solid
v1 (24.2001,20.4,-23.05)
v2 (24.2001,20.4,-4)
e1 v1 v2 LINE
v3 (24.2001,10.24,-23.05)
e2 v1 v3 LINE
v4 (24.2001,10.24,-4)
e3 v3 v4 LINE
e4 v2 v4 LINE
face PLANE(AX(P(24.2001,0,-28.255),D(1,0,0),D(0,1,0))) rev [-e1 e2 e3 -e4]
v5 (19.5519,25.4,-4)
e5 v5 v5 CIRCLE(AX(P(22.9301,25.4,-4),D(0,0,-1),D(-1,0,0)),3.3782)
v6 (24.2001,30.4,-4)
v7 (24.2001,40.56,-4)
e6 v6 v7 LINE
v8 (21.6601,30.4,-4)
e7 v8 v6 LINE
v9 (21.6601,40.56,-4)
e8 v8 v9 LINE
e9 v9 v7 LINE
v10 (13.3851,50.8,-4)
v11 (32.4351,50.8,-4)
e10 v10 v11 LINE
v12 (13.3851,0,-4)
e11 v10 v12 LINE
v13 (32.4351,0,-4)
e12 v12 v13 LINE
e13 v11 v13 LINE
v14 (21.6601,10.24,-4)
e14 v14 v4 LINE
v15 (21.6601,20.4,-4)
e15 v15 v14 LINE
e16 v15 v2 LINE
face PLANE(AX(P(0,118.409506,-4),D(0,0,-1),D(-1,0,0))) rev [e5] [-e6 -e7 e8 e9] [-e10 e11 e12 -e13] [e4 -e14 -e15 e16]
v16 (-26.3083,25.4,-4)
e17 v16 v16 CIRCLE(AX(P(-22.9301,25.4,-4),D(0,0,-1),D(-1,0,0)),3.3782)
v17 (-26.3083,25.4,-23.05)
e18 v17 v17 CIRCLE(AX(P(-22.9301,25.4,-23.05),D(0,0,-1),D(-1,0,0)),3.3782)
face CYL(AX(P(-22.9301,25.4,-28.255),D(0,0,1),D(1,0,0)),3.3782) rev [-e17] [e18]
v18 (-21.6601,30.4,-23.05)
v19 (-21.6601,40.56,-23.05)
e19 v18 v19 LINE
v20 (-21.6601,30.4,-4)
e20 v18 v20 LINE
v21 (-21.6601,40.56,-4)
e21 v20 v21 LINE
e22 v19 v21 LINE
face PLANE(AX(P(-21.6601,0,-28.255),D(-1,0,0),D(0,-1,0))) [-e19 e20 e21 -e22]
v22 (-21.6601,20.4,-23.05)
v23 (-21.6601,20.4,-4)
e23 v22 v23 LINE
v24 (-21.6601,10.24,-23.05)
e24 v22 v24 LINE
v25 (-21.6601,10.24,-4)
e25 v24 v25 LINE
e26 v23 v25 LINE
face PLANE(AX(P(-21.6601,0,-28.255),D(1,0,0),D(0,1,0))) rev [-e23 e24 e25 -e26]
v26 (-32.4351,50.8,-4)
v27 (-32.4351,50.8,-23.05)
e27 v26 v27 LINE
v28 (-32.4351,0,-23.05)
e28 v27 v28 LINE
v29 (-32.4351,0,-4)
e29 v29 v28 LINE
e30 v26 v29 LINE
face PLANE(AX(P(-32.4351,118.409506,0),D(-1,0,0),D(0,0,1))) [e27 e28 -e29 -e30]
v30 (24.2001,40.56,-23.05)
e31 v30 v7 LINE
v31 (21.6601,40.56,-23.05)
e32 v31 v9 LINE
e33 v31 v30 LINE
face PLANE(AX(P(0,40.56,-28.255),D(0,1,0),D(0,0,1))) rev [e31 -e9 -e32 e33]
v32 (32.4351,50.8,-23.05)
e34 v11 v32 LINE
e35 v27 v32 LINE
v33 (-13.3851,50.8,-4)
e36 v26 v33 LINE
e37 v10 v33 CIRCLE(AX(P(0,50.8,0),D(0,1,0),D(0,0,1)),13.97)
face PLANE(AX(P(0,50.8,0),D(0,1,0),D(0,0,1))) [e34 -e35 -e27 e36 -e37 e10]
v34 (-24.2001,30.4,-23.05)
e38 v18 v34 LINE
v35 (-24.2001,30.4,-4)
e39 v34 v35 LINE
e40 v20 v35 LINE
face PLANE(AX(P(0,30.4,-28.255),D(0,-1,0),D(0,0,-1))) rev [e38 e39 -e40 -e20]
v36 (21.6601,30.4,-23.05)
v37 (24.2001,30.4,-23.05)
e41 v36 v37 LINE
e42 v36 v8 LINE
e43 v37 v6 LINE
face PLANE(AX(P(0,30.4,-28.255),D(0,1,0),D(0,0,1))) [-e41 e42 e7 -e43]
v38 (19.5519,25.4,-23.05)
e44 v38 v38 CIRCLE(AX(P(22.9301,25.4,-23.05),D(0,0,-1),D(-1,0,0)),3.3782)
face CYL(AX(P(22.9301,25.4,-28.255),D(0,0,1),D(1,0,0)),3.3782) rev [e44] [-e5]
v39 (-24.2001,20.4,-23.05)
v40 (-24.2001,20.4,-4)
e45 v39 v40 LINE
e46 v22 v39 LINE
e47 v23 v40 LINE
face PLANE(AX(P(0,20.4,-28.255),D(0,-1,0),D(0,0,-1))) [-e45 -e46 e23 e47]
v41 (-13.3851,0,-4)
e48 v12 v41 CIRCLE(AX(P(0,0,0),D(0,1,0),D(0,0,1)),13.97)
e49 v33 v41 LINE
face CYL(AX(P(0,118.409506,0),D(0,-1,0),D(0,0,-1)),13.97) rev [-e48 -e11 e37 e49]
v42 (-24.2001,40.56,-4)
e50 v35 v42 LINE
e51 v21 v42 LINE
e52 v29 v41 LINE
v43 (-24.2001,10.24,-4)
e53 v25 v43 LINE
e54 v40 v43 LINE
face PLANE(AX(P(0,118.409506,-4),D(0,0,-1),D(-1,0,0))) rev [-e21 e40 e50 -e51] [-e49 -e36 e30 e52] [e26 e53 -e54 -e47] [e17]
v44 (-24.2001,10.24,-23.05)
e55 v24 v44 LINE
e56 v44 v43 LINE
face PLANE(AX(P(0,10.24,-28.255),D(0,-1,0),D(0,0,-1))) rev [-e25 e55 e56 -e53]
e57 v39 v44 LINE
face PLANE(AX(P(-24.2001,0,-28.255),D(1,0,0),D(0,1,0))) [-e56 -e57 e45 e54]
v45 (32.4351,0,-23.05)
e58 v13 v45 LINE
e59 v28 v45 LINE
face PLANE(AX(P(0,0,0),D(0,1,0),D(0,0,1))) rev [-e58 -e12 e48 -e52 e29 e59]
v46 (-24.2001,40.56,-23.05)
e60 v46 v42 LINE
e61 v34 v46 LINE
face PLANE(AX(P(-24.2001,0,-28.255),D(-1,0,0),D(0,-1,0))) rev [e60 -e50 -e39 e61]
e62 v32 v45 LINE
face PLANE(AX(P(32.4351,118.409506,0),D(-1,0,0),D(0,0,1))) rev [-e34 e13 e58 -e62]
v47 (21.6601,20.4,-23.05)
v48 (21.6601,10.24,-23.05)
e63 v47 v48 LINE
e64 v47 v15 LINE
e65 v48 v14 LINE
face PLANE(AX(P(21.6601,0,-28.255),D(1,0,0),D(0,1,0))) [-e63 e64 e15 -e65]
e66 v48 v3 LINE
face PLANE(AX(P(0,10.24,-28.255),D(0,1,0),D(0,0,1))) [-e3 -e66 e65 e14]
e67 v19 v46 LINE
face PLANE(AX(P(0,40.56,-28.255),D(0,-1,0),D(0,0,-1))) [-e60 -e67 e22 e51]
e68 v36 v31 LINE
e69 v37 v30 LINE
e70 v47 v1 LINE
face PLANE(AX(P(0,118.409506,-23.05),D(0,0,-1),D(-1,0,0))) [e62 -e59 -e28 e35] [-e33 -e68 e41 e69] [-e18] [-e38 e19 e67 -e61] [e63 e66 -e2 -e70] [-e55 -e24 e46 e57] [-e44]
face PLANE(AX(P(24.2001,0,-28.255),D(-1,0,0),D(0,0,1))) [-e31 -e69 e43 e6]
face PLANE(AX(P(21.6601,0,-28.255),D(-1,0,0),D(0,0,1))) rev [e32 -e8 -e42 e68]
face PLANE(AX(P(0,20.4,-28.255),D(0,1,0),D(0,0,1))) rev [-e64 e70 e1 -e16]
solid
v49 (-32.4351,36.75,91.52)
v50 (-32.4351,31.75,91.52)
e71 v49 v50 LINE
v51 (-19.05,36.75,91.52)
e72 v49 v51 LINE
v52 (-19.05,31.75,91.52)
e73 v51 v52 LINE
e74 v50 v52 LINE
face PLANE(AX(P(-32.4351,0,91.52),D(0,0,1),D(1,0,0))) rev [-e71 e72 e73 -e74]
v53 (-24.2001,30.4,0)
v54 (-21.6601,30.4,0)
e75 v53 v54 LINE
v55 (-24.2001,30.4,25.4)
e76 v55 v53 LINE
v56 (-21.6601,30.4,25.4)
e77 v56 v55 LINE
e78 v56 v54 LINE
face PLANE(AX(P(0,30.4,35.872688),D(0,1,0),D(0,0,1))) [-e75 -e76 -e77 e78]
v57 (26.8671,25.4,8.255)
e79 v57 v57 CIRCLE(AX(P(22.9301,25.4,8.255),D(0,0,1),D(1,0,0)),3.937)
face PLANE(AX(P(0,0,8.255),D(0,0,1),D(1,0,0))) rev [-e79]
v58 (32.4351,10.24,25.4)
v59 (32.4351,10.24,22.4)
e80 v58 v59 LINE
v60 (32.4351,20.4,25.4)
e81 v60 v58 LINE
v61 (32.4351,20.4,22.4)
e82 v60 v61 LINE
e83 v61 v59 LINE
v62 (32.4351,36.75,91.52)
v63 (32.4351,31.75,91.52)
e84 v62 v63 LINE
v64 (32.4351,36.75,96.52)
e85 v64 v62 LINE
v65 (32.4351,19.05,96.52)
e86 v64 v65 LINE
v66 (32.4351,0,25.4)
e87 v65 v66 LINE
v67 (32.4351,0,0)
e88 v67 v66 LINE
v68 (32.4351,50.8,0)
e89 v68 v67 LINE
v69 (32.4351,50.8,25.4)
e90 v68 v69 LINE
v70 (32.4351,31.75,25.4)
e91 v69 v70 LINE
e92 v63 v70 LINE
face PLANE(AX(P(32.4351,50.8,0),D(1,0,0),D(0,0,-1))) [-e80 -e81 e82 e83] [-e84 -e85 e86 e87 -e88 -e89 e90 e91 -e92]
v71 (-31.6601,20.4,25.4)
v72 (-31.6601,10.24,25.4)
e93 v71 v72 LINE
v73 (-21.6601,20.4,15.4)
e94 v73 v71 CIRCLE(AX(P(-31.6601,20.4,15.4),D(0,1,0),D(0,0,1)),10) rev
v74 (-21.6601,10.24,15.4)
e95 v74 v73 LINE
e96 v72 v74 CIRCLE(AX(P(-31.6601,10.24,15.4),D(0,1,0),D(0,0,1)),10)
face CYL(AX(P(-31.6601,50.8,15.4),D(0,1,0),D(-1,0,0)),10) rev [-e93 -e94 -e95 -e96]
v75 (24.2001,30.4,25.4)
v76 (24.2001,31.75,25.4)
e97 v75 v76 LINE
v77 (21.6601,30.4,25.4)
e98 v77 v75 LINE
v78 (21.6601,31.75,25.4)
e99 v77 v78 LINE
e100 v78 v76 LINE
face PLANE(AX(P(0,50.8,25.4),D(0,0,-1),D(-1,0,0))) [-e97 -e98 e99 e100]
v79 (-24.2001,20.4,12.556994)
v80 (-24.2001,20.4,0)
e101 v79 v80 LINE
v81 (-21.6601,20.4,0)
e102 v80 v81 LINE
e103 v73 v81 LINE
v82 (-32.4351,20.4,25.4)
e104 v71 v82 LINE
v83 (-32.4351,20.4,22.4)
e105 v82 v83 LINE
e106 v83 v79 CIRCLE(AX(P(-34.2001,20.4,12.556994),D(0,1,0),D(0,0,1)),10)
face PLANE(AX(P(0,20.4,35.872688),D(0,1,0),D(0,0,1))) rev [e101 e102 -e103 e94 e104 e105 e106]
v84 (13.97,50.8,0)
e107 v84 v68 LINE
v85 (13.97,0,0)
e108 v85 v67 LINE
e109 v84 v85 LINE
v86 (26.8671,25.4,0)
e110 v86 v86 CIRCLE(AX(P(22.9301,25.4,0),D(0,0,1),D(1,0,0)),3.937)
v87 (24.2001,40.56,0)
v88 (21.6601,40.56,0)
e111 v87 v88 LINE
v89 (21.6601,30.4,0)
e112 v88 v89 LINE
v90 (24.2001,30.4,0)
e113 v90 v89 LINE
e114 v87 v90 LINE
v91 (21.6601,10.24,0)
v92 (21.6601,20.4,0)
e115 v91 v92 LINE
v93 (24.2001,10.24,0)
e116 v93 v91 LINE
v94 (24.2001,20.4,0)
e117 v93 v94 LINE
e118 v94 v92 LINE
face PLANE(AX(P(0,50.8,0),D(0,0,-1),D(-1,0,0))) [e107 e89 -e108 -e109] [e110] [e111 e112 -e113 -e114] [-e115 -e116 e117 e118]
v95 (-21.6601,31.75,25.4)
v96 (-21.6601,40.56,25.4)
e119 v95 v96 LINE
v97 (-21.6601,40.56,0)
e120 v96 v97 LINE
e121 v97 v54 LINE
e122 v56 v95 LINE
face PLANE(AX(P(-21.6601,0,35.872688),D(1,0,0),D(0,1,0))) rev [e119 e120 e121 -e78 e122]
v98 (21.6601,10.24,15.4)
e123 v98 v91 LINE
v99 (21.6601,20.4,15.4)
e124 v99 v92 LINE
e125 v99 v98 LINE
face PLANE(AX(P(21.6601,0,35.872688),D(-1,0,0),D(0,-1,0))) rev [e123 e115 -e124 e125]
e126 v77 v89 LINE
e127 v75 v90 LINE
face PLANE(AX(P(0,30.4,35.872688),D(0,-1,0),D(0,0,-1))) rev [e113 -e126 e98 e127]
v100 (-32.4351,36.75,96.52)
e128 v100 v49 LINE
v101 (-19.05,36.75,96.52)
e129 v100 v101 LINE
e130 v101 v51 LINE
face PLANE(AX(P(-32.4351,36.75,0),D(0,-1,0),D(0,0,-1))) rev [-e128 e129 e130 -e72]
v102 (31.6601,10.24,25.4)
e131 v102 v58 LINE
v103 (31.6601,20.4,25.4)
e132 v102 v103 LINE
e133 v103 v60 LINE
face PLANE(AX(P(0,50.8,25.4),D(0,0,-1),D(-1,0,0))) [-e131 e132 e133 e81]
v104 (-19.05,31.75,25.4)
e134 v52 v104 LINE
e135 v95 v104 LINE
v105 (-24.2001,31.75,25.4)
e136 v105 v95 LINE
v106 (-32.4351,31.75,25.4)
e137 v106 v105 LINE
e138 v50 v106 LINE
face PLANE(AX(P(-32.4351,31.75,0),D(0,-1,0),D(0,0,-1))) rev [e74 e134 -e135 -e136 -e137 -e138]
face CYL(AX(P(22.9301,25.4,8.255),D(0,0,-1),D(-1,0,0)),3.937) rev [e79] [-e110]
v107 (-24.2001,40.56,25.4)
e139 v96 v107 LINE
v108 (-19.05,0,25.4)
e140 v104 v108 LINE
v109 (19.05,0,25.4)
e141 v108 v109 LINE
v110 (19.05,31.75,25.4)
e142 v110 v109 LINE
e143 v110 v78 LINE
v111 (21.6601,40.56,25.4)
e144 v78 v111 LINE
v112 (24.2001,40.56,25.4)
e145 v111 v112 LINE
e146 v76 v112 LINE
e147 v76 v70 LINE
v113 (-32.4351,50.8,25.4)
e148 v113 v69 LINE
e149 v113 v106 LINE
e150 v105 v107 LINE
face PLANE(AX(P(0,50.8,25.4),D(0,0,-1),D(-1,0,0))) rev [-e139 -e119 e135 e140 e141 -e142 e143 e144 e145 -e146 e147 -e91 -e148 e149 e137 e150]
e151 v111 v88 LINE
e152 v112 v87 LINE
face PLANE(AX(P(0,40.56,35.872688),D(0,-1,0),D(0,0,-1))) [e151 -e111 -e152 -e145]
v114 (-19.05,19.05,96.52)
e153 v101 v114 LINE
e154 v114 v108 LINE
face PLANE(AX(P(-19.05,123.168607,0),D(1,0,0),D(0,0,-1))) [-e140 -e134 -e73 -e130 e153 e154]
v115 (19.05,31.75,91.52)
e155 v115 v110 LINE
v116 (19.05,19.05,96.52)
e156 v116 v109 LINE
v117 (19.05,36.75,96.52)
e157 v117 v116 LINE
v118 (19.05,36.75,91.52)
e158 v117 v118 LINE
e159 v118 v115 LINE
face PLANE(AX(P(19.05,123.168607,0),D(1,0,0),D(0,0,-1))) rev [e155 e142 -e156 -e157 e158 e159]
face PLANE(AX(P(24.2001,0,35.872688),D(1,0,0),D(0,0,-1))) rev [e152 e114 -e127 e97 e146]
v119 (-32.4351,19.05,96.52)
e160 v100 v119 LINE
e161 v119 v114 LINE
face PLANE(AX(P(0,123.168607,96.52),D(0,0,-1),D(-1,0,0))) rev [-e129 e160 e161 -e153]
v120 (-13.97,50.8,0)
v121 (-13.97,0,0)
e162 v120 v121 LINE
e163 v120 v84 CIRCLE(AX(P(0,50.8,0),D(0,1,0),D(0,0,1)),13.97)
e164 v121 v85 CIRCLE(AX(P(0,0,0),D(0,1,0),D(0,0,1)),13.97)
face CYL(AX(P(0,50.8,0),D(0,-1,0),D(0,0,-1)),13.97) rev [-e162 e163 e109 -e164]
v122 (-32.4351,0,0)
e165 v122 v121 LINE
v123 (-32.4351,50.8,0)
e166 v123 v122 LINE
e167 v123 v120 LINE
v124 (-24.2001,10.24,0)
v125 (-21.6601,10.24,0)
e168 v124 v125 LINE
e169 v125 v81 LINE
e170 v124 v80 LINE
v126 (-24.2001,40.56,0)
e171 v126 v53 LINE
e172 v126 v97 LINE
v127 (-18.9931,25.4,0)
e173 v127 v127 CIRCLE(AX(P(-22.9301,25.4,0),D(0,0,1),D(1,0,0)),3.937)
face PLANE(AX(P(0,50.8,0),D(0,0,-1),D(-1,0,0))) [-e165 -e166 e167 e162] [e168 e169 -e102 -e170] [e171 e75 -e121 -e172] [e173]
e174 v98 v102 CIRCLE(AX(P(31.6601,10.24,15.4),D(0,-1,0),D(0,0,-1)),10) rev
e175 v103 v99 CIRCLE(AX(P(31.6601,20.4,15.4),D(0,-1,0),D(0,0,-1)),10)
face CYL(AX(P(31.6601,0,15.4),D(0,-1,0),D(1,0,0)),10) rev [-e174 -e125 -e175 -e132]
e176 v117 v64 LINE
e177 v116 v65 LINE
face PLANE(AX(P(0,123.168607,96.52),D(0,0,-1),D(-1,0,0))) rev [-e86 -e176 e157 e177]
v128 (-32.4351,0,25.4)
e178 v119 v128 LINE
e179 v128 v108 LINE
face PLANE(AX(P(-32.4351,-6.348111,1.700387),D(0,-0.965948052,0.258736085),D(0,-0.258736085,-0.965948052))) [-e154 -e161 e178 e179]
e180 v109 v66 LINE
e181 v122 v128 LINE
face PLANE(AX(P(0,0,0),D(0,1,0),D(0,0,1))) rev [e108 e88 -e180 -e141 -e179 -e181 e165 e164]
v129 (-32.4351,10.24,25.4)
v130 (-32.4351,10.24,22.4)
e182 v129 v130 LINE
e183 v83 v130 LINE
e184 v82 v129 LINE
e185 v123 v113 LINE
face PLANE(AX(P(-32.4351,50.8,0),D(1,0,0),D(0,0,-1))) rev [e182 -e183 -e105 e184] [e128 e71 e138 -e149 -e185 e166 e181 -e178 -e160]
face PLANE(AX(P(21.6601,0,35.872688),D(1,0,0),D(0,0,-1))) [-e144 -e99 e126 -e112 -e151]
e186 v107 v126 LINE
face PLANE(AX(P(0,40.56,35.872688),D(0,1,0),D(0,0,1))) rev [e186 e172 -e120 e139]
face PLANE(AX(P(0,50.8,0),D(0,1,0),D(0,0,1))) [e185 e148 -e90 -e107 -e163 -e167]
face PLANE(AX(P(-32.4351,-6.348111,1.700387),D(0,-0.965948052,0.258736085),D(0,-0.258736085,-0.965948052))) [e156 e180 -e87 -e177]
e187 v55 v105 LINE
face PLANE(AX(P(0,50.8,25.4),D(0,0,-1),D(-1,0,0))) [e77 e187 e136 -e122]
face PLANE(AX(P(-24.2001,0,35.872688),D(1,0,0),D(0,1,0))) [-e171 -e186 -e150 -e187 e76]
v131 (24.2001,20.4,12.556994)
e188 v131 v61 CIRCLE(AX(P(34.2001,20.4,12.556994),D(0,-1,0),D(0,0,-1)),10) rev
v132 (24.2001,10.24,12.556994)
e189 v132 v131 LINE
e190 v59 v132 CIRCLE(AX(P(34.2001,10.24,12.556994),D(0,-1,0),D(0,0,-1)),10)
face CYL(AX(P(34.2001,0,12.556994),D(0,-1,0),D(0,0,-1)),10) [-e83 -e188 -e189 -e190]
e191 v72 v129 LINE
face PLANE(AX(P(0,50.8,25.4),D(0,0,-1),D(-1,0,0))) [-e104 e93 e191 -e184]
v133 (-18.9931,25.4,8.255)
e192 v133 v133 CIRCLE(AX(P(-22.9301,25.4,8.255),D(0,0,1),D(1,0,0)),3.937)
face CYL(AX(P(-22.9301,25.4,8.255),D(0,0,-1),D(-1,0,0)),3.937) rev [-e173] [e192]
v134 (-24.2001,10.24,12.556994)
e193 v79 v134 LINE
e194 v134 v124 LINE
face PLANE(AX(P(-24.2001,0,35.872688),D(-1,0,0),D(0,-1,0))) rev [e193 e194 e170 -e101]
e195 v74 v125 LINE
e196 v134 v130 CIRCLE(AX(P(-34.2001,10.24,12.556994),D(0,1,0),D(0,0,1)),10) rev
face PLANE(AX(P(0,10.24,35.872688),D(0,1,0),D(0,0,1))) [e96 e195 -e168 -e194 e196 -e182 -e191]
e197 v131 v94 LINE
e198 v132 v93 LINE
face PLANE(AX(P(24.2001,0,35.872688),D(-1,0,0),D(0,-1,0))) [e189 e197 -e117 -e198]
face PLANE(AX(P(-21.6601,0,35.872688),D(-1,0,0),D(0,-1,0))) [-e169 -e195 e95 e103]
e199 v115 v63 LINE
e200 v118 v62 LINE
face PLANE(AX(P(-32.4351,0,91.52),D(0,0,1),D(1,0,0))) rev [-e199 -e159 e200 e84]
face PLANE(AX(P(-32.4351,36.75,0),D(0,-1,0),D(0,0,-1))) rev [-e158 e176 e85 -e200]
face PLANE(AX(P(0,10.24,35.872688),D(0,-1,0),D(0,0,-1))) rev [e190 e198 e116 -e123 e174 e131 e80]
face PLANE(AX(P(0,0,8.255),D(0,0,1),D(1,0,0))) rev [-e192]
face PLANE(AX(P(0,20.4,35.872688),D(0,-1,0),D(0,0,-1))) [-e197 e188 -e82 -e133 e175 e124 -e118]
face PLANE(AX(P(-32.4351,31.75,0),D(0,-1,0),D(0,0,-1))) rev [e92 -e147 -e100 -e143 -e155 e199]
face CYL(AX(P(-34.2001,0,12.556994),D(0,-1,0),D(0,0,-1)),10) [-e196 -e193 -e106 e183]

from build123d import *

# Parameters (mm, degrees)
BOSS_EXTRUDE1_DEPTH = 50.8
BOSS_EXTRUDE3_DEPTH = 50.8
SKETCH1_4_W         = 13.385099925
SKETCH1_4_H         = 71.12
BOSS_EXTRUDE2_DEPTH = 50.8
CUT_EXTRUDE1_START  = -32.435099925
CUT_EXTRUDE1_DEPTH  = 64.87019985
SKETCH3_R           = 3.937
SKETCH3_R_2         = 3.3782
CUT_EXTRUDE2_DEPTH  = 8.255
SKETCH3_2_W         = 2.54
SKETCH3_2_H         = 10.16
CUT_EXTRUDE3_DEPTH  = 25.4
CUT_EXTRUDE6_START  = -32.4351
SKETCH2_6_W         = 3
SKETCH2_6_H         = 10.16
CUT_EXTRUDE6_DEPTH  = 8.235
CUT_EXTRUDE7_START  = 21.6601
CUT_EXTRUDE7_DEPTH  = 10.775
FILLET2_R           = 10
SKETCH3_5_R         = 3.3782
SKETCH3_5_W         = 2.54
SKETCH3_5_H         = 10.16
CUT_EXTRUDE8_DEPTH  = 28.255


with BuildPart() as part:
    # Sketch1 → Boss-Extrude1 (new body)
    with BuildSketch(Plane(origin=(0, 0, 0), x_dir=(1, 0, 0), z_dir=(0, 1, 0))):
        with BuildLine():
            ThreePointArc((13.97, 0), (0, -13.97), (-13.97, 0))
            Line((-13.97, 0), (-32.435099925, 0))
            Line((-32.435099925, 0), (-32.435099925, -25.4))
            Line((-32.435099925, -25.4), (-19.05, -25.4))
            Line((-19.05, -25.4), (19.05, -25.4))
            Line((19.05, -25.4), (32.435099925, -25.4))
            Line((32.435099925, -25.4), (32.435099925, 0))
            Line((32.435099925, 0), (13.97, 0))
        make_face()
    extrude(amount=BOSS_EXTRUDE1_DEPTH)

    # Sketch1<4> → Boss-Extrude2 (add)
    with BuildSketch(Plane(origin=(0, 0, 0), x_dir=(1, 0, 0), z_dir=(0, 1, 0))):
        with Locations((-25.742549963, -60.96)):
            Rectangle(SKETCH1_4_W, SKETCH1_4_H)
        with Locations((25.742549963, -60.96)):
            Rectangle(SKETCH1_4_W, SKETCH1_4_H)
    extrude(amount=BOSS_EXTRUDE2_DEPTH)

    # Cut-Extrude1: read off the stored shape, not the designer's step
    # Cut-Extrude1 outline → Cut-Extrude1 (cut)
    with BuildSketch(Plane(origin=(0, 0, 0), x_dir=(0, 0, -1), z_dir=(1, 0, 0)).offset(CUT_EXTRUDE1_START)):
        Polygon((-96.52, 0), (-25.4, 0), (-96.52, 19.05), align=None)
        Polygon((-91.52, 31.75), (-25.4, 31.75), (-25.4, 50.8), (-96.52, 50.8), (-96.52, 36.75), (-91.52, 36.75), align=None)
    extrude(amount=CUT_EXTRUDE1_DEPTH, mode=Mode.SUBTRACT)

    # Sketch3 → Cut-Extrude2 (cut)
    # profile 1 of 4: a face of its own
    with BuildSketch(Plane.XY):
        with Locations((-22.930099925, 25.4)):
            Circle(SKETCH3_R)
        with Locations((-22.930099925, 25.4)):
            Circle(SKETCH3_R_2, mode=Mode.SUBTRACT)
    # profile 2 of 4: a face of its own
    with BuildSketch(Plane.XY):
        with Locations((-22.930099925, 25.4)):
            Circle(SKETCH3_R_2)
    # profile 3 of 4: a face of its own
    with BuildSketch(Plane.XY):
        with Locations((22.930099925, 25.4)):
            Circle(SKETCH3_R)
        with Locations((22.930099925, 25.4)):
            Circle(SKETCH3_R_2, mode=Mode.SUBTRACT)
    # profile 4 of 4: a face of its own
    with BuildSketch(Plane.XY):
        with Locations((22.930099925, 25.4)):
            Circle(SKETCH3_R_2)
    extrude(amount=CUT_EXTRUDE2_DEPTH, mode=Mode.SUBTRACT)

    # Sketch3<2> → Cut-Extrude3 (cut)
    with BuildSketch(Plane.XY):
        with Locations((22.930099925, 35.48)):
            Rectangle(SKETCH3_2_W, SKETCH3_2_H)
        with Locations((-22.930099925, 35.48)):
            Rectangle(SKETCH3_2_W, SKETCH3_2_H)
        with Locations((22.930099925, 15.32)):
            Rectangle(SKETCH3_2_W, SKETCH3_2_H)
        with Locations((-22.930099925, 15.32)):
            Rectangle(SKETCH3_2_W, SKETCH3_2_H)
    extrude(amount=CUT_EXTRUDE3_DEPTH, mode=Mode.SUBTRACT)

    # Sketch2<6> → Cut-Extrude6 (cut)
    with BuildSketch(Plane(origin=(0, 0, 0), x_dir=(0, 0, -1), z_dir=(1, 0, 0)).offset(CUT_EXTRUDE6_START)):
        Polygon((-96.52, 19.05), (-96.52, 0), (-25.4, 0), align=None)
        with Locations((-23.9, 15.32)):
            Rectangle(SKETCH2_6_W, SKETCH2_6_H)
    extrude(amount=CUT_EXTRUDE6_DEPTH, mode=Mode.SUBTRACT)

    # Sketch2<7> → Cut-Extrude7 (cut)
    with BuildSketch(Plane(origin=(0, 0, 0), x_dir=(0, 0, -1), z_dir=(1, 0, 0)).offset(CUT_EXTRUDE7_START)):
        Polygon((-22.4, 20.4), (-25.4, 20.4), (-25.4, 19.05), (-25.4, 10.24), (-22.4, 10.24), align=None)
    extrude(amount=CUT_EXTRUDE7_DEPTH, mode=Mode.SUBTRACT)

    # Fillet2
    # the kernel refuses this fillet: 10 mm, written as the material it takes off along each edge
    with BuildSketch(Plane(origin=(24.200099925, 20.4, 22.4), x_dir=(0, 0, -1), z_dir=(0, -1, 0))) as fillet2_piece_1:
        with BuildLine():
            CenterArc((9.843006414, 10), FILLET2_R, 190.165960228, 79.834039772)
            Line((0, 8.235000075), (0, 0))
            Line((0, 0), (9.843006414, 0))
        make_face()
    extrude(amount=10.16, mode=Mode.SUBTRACT)
    # the kernel refuses this fillet: 10 mm, written as the material it takes off along each edge
    with BuildSketch(Plane(origin=(-24.2001, 20.4, 22.4), x_dir=(7.62810550624482e-09, 0, -1.0), z_dir=(0, -1, 0))) as fillet2_2_piece_1:
        with BuildLine():
            CenterArc((9.843006338, -10), FILLET2_R, 89.999999563, 79.834039772)
            Line((-6.3e-08, -8.235), (0, 0))
            Line((0, 0), (9.843006414, 0))
        make_face()
    extrude(amount=10.16, mode=Mode.SUBTRACT)
    # the kernel refuses this fillet: 10 mm, written as the material it adds along each edge
    with BuildSketch(Plane(origin=(21.660099925, 10.24, 25.4), x_dir=(1, 0, 0), z_dir=(0, 1, 0))) as fillet2_3_piece_1_section:
        with BuildLine():
            CenterArc((FILLET2_R, FILLET2_R), FILLET2_R, 180, 90)
            Line((0, FILLET2_R), (0, 0))
            Line((0, 0), (FILLET2_R, 0))
        make_face()
    fillet2_3_piece_1 = extrude(amount=35.16, mode=Mode.PRIVATE)
    fillet2_3_piece_1 = split(fillet2_3_piece_1, bisect_by=Plane(origin=(21.660099925, 30.4, 25.4), z_dir=(0, -1, 0)), keep=Keep.TOP, mode=Mode.PRIVATE)
    add(fillet2_3_piece_1)
    # the kernel refuses this fillet: 10 mm, written as the material it adds along each edge
    with BuildSketch(Plane(origin=(-21.660099925, 45.4, 25.4), x_dir=(0, 0, -1), z_dir=(0, -1, 0))) as fillet2_4_piece_1_section:
        with BuildLine():
            CenterArc((FILLET2_R, -FILLET2_R), FILLET2_R, 90, 90)
            Line((0, -FILLET2_R), (0, 0))
            Line((0, 0), (FILLET2_R, 0))
        make_face()
    fillet2_4_piece_1 = extrude(amount=60.16, mode=Mode.PRIVATE)
    fillet2_4_piece_1 = split(fillet2_4_piece_1, bisect_by=Plane(origin=(-21.660099925, 30.4, 25.4), z_dir=(0, -1, 0)), keep=Keep.TOP, mode=Mode.PRIVATE)
    fillet2_4_piece_1 = split(fillet2_4_piece_1, bisect_by=Plane(origin=(-21.660099925, 0, 25.4), z_dir=(0, 1, 0)), keep=Keep.TOP, mode=Mode.PRIVATE)
    add(fillet2_4_piece_1)


with BuildPart() as body_2:
    # Sketch1<5> → Boss-Extrude3 (new body)
    with BuildSketch(Plane(origin=(0, 0, 0), x_dir=(1, 0, 0), z_dir=(0, 1, 0))):
        with BuildLine():
            Line((-32.435099925, 4), (-13.385099925, 4))
            ThreePointArc((-13.385099925, 4), (0, 13.97), (13.385099925, 4))
            Line((13.385099925, 4), (32.435099925, 4))
            Line((32.435099925, 4), (32.435099925, 23.05))
            Line((32.435099925, 23.05), (-32.435099925, 23.05))
            Line((-32.435099925, 23.05), (-32.435099925, 4))
        make_face()
    extrude(amount=BOSS_EXTRUDE3_DEPTH)

    # Sketch3<5> → Cut-Extrude8 (cut)
    with BuildSketch(Plane.XY):
        with Locations(Location((22.930099925, 25.4, 0), (0, 0, 180))):
            Circle(SKETCH3_5_R)
        with Locations((22.930099925, 35.48)):
            Rectangle(SKETCH3_5_W, SKETCH3_5_H)
        with Locations((22.930099925, 15.32)):
            Rectangle(SKETCH3_5_W, SKETCH3_5_H)
        with Locations((-22.930099925, 35.48)):
            Rectangle(SKETCH3_5_W, SKETCH3_5_H)
        with Locations(Location((-22.930099925, 25.4, 0), (0, 0, 180))):
            Circle(SKETCH3_5_R)
        with Locations((-22.930099925, 15.32)):
            Rectangle(SKETCH3_5_W, SKETCH3_5_H)
    extrude(amount=-CUT_EXTRUDE8_DEPTH, mode=Mode.SUBTRACT)


solid = Compound([part.part, body_2.part])
